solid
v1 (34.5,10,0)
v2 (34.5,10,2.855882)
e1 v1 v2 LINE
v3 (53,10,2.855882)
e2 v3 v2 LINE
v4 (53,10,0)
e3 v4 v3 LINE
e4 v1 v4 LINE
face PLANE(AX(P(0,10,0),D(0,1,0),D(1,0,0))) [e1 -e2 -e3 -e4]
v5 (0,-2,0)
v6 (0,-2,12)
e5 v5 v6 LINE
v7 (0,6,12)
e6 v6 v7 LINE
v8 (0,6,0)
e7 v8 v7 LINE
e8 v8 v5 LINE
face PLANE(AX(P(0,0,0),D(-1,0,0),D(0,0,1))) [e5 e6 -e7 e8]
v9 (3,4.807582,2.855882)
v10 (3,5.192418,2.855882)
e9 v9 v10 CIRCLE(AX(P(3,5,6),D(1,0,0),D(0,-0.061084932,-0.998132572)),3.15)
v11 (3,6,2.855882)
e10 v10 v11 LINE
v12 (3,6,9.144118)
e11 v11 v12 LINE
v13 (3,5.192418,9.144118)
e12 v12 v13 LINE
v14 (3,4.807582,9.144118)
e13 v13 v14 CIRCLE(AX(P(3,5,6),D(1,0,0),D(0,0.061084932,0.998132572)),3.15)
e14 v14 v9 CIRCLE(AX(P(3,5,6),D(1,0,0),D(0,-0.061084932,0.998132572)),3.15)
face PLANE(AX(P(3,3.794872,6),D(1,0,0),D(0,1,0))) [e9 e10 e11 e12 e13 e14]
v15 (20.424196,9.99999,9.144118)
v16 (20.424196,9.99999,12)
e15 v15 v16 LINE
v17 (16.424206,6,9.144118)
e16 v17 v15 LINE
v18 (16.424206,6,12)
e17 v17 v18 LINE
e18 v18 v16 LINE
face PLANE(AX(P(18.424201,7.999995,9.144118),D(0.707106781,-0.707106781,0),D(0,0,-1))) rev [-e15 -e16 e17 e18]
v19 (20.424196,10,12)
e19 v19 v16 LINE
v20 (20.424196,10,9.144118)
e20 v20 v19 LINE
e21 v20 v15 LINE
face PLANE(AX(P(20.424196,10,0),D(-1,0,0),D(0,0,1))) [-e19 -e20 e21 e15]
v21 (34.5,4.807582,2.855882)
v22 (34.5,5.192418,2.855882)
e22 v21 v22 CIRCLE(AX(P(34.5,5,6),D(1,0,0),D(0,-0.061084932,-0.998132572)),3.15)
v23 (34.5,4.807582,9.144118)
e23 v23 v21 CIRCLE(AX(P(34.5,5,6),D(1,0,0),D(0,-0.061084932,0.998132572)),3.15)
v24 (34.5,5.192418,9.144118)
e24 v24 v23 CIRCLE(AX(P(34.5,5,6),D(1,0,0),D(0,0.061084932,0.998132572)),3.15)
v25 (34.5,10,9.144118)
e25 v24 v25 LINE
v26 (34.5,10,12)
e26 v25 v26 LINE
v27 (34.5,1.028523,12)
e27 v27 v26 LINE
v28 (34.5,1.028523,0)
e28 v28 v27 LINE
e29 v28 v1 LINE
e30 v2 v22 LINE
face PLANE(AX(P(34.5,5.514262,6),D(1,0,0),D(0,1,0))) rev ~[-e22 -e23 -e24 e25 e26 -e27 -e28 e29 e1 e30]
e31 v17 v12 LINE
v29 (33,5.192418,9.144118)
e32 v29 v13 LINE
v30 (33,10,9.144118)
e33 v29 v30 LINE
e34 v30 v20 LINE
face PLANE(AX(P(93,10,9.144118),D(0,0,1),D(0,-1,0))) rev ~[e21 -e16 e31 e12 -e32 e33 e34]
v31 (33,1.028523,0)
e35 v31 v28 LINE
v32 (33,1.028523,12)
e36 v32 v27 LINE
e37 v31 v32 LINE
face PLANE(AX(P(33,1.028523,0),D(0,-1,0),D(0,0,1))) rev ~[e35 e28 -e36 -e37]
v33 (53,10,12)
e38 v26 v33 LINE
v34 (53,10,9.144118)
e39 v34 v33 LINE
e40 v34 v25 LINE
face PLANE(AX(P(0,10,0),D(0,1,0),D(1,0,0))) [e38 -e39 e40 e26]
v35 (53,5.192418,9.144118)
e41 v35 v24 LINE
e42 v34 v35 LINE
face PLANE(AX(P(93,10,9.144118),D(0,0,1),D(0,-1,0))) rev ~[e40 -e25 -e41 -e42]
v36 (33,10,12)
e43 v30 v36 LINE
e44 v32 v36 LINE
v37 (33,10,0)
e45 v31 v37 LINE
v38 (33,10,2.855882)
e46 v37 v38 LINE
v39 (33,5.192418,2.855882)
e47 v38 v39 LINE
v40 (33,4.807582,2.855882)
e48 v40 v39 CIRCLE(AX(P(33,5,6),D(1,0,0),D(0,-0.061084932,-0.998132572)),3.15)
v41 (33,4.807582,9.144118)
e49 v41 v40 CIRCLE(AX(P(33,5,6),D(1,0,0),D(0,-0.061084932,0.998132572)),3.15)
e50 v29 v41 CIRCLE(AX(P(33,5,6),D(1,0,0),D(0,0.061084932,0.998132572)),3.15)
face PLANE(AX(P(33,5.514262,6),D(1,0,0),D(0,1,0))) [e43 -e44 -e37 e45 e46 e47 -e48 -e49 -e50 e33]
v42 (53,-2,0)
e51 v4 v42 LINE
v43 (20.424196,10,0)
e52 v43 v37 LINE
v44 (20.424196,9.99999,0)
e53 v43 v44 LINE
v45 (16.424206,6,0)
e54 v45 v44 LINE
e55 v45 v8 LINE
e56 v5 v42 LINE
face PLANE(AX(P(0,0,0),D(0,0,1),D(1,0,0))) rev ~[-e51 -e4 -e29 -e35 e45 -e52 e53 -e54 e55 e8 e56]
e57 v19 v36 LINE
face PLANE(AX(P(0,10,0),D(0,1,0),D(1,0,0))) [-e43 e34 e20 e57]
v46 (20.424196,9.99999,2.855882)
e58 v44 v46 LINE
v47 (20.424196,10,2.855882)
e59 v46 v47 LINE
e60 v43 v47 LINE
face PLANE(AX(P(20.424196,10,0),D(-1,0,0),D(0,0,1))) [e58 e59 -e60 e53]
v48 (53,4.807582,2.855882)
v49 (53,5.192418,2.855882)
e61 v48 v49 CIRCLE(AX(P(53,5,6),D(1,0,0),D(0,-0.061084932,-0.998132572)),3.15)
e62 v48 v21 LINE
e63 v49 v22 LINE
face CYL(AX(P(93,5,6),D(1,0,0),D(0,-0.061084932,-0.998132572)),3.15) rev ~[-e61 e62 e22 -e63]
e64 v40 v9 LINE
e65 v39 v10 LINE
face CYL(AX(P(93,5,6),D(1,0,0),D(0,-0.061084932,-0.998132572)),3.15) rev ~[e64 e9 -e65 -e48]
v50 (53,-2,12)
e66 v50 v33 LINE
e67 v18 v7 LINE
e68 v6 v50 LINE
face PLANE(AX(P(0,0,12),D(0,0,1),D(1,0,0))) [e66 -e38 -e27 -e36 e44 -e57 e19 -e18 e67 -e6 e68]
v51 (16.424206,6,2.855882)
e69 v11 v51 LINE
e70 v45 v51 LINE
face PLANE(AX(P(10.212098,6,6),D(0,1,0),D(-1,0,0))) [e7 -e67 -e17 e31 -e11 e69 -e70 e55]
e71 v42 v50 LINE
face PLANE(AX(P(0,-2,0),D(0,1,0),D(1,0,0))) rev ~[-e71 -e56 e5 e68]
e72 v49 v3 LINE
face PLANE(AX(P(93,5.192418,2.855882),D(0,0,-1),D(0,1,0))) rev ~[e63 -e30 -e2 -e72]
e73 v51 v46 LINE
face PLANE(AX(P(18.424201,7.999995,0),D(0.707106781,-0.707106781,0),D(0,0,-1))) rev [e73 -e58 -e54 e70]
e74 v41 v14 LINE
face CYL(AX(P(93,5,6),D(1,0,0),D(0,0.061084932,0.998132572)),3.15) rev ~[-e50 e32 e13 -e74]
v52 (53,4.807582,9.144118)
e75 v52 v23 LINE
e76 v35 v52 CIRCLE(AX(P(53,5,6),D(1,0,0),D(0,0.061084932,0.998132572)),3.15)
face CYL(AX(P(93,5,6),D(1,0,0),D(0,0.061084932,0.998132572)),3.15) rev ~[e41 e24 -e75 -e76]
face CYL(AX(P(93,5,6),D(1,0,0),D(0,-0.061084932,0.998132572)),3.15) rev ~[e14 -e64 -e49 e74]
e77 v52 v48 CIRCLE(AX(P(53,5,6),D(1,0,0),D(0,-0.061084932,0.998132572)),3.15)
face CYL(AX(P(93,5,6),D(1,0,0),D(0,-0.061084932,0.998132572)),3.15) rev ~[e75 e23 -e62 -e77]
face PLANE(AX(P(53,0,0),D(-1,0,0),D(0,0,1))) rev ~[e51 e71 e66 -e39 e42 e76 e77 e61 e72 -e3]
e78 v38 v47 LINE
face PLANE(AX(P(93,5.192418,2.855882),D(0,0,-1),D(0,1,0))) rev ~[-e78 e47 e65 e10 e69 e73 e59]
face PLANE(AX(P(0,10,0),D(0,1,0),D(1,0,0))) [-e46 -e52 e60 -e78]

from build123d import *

# Parameters (mm, degrees)
F0_W      = 93
F0_H      = 10
F1_DEPTH  = 12
F3_DEPTH  = 90
F5_W      = 8.9714768017
F5_H      = 12
F6_DEPTH  = 1.5
F7_DEPTH  = 2
F8_DEPTH  = 40
F9_W      = 20.4241964966
F9_H      = 12
F10_DEPTH = 4
F11_SIZE  = 3.99999


# Not quite as in the source:
# - a fillet or chamfer is up to 0.001 mm smaller than in the source, because OpenCascade refuses the exact size


with BuildPart() as f1:
    # F0 (on Top) → F1 (new body)
    with BuildSketch(Plane.XY):
        with Locations((46.5, 5)):
            Rectangle(F0_W, F0_H)
    extrude(amount=F1_DEPTH)

    # F2 (on face) → F3 (cut)
    with BuildSketch(Plane.YZ.offset(93)):
        with BuildLine():
            Line((4.8075824627, 6), (4.8075824627, 9.1441176014))
            ThreePointArc((4.8075824627, 9.1441176014), (1.85, 6), (4.8075824627, 2.8558823986))
            Line((4.8075824627, 2.8558823986), (4.8075824627, 6))
        make_face()
        with BuildLine():
            ThreePointArc((5.1924175373, 9.1441176014), (5, 9.15), (4.8075824627, 9.1441176014))
            Line((4.8075824627, 9.1441176014), (5.1924175373, 9.1441176014))
        make_face()
        with BuildLine():
            Line((5.1924175373, 9.1441176014), (4.8075824627, 9.1441176014))
            Line((4.8075824627, 9.1441176014), (4.8075824627, 6))
            Line((4.8075824627, 6), (8.15, 6))
            ThreePointArc((8.15, 6), (7.2944079021, 8.1582845917), (5.1924175373, 9.1441176014))
        make_face()
        with BuildLine():
            Line((5.1924175373, 2.8558823986), (4.8075824627, 2.8558823986))
            ThreePointArc((4.8075824627, 2.8558823986), (5, 2.85), (5.1924175373, 2.8558823986))
        make_face()
        with BuildLine():
            Line((4.8075824627, 6), (4.8075824627, 2.8558823986))
            Line((4.8075824627, 2.8558823986), (5.1924175373, 2.8558823986))
            ThreePointArc((5.1924175373, 2.8558823986), (7.2944079021, 3.8417154083), (8.15, 6))
            Line((8.15, 6), (4.8075824627, 6))
        make_face()
        with BuildLine():
            Line((10, 9.1441176014), (5.1924175373, 9.1441176014))
            ThreePointArc((5.1924175373, 9.1441176014), (7.2944079021, 8.1582845917), (8.15, 6))
            Line((8.15, 6), (10, 6))
            Line((10, 6), (10, 9.1441176014))
        make_face()
        with BuildLine():
            ThreePointArc((8.15, 6), (7.2944079021, 3.8417154083), (5.1924175373, 2.8558823986))
            Line((5.1924175373, 2.8558823986), (10, 2.8558823986))
            Line((10, 2.8558823986), (10, 6))
            Line((10, 6), (8.15, 6))
        make_face()
    extrude(amount=-F3_DEPTH, mode=Mode.SUBTRACT)

    # F5 (on offset) → F6 (cut)
    with BuildSketch(Plane.YZ.offset(33)):
        with Locations((5.5142615992, 6)):
            Rectangle(F5_W, F5_H)
    extrude(amount=F6_DEPTH, mode=Mode.SUBTRACT)

    # F7 (add): a face of the model
    f7_faces = [f1.faces().sort_by_distance(p)[0] for p in [
        (46.5, 0, 6),
    ]]
    extrude(f7_faces, amount=F7_DEPTH)

    # F8 (cut): a face of the model
    f8_faces = [f1.faces().sort_by_distance(p)[0] for p in [
        (93, 4, 0.1697056275),
    ]]
    extrude(f8_faces, amount=-F8_DEPTH, mode=Mode.SUBTRACT)

    # F9 (on face) → F10 (cut)
    with BuildSketch(Plane(origin=(0, 10, 0), x_dir=(-1, 0, 0), z_dir=(0, 1, 0))):
        with Locations((-10.2120982483, 6)):
            Rectangle(F9_W, F9_H)
    extrude(amount=-F10_DEPTH, mode=Mode.SUBTRACT)

    # F11 (size 4 in the source; OpenCascade refuses exactly that, so slightly less here)
    f11_edges = [f1.edges().sort_by_distance(p)[0] for p in [
        (20.424196, 6, 1.427941),
        (20.424196, 6, 10.572059),
    ]]
    chamfer(f11_edges, length=F11_SIZE)


solid = f1.part
